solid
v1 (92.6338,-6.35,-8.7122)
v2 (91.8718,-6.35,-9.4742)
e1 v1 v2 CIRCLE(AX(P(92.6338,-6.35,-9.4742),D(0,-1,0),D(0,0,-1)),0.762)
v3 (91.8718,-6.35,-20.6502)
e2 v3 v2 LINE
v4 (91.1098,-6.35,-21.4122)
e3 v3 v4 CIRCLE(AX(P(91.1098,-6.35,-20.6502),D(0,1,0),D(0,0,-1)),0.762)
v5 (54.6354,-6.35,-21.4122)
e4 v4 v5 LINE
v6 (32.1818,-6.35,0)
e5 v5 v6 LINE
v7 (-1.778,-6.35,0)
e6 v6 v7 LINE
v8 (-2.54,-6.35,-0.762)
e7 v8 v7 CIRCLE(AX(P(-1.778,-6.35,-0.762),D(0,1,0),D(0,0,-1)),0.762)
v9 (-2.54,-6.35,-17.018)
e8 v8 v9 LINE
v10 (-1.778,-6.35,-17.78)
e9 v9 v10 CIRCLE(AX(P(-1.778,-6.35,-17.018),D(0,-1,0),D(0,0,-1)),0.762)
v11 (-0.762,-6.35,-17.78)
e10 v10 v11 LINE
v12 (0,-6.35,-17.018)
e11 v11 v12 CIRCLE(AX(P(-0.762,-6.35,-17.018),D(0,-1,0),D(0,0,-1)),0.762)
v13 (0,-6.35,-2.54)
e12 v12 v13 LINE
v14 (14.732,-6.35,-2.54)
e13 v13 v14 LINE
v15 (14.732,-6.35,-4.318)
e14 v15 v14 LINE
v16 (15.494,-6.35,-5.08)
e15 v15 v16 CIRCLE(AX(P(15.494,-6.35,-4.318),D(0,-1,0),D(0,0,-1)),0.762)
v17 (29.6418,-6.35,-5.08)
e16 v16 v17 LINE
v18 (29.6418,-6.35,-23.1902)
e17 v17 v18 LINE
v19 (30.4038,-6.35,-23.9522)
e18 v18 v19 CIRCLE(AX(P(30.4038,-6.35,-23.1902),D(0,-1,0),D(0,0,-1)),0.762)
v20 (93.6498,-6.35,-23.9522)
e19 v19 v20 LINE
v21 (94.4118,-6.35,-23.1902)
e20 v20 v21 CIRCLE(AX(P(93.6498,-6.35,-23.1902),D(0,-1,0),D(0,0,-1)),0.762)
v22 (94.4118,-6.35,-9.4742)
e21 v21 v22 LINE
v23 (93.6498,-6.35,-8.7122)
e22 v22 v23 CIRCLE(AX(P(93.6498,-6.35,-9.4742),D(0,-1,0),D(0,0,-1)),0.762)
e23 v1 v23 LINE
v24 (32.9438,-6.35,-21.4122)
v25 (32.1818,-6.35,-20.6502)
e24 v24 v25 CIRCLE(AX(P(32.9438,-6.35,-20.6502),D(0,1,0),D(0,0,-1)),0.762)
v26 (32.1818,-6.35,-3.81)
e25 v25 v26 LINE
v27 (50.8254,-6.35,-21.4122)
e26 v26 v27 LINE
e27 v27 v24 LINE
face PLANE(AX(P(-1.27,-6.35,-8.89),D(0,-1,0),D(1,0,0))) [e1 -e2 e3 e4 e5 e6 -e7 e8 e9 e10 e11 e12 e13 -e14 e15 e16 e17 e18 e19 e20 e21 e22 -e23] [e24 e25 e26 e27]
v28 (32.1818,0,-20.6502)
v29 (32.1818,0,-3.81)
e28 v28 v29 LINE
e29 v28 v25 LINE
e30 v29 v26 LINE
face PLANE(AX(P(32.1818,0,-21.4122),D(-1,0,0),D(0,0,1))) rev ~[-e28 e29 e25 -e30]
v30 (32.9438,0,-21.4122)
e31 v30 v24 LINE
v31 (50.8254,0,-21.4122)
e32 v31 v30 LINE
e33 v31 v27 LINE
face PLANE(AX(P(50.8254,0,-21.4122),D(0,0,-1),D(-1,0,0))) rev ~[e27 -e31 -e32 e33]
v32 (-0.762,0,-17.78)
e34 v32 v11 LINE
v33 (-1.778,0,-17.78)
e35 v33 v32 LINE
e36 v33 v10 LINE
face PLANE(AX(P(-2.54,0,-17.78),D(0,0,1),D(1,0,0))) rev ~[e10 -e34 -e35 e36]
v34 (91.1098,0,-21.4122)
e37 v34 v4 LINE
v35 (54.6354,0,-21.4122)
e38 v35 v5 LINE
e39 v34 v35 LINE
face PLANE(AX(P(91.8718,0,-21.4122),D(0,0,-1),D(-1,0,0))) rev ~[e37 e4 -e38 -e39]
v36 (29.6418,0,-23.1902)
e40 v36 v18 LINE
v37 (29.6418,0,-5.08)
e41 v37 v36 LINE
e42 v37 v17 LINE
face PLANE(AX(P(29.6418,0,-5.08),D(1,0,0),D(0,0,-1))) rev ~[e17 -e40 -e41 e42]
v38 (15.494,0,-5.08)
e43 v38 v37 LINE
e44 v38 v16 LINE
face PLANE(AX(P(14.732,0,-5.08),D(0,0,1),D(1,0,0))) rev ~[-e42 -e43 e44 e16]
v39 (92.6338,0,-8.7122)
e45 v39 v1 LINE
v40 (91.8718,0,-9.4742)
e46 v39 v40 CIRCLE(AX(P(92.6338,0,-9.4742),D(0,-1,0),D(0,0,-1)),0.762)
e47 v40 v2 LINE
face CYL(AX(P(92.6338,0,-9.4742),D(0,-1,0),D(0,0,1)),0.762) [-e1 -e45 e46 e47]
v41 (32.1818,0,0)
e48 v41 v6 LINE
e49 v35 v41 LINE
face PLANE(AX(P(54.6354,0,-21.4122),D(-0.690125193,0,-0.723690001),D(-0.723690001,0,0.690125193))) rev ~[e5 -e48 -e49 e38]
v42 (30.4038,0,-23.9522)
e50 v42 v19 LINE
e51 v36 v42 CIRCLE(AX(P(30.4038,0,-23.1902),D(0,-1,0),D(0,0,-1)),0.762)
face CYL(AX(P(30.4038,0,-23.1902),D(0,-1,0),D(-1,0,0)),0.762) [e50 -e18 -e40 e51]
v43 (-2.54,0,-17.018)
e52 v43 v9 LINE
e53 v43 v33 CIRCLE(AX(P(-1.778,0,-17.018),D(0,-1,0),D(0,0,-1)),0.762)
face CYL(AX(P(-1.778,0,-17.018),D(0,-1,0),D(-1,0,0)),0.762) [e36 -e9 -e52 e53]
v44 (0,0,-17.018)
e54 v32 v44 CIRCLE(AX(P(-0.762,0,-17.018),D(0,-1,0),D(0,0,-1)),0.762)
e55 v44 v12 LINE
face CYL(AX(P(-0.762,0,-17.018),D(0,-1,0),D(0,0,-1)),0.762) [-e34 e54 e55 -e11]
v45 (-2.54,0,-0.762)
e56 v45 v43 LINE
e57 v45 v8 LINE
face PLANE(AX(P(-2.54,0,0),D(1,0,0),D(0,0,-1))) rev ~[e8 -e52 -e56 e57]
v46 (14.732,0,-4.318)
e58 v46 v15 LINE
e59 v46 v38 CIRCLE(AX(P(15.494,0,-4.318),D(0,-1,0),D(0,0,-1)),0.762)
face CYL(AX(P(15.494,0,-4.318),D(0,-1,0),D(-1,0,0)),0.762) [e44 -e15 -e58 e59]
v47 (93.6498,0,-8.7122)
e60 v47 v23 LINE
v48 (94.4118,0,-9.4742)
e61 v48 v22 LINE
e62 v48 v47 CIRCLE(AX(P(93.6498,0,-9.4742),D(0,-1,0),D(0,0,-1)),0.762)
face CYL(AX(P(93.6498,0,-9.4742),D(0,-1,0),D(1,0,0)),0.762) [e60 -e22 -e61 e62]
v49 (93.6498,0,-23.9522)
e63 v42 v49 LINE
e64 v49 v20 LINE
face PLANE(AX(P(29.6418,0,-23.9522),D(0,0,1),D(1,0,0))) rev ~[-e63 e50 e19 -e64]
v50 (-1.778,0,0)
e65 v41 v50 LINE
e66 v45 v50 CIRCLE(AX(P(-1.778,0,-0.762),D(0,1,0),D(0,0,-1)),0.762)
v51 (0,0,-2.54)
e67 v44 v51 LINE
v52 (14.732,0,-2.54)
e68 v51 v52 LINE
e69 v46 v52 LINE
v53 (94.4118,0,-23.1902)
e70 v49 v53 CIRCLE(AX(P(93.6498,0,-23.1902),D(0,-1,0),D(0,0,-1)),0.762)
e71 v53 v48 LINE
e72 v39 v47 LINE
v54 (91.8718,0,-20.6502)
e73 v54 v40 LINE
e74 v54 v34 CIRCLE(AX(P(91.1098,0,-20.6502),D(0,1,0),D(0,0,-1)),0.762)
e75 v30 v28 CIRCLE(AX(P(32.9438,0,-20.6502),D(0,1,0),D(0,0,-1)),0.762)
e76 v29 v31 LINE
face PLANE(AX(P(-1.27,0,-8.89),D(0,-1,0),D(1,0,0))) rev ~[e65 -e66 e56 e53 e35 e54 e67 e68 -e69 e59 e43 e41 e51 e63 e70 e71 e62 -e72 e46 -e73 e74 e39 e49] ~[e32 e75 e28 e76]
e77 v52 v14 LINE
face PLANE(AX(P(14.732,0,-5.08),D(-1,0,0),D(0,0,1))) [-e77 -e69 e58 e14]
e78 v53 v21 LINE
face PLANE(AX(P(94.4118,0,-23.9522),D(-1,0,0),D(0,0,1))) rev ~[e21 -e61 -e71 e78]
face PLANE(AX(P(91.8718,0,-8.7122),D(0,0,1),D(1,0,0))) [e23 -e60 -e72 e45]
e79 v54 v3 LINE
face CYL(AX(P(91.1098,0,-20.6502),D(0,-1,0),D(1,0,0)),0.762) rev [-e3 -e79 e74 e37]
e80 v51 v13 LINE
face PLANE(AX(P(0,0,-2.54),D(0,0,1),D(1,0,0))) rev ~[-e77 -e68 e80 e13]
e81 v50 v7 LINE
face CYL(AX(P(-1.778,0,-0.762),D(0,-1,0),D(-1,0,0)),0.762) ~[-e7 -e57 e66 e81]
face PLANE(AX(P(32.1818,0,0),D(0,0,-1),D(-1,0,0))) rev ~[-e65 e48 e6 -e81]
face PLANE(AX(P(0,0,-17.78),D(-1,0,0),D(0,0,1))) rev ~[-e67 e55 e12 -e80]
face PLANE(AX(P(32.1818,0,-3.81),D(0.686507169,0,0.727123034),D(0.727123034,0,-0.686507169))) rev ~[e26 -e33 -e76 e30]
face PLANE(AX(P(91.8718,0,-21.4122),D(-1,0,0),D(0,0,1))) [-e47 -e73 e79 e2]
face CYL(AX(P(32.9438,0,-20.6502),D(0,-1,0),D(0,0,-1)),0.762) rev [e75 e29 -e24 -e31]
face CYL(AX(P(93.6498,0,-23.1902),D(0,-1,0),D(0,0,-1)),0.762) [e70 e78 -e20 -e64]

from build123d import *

# Parameters (mm, degrees)
F0_W     = 14.9098
F0_H     = 2.54
F0_W_2   = 2.54
F0_H_2   = 12.7
F1_DEPTH = 6.35
F2_R     = 0.762


with BuildPart() as f1:
    # F0 (on Front) → F1 (new body)
    with BuildSketch(Plane.XZ):
        Polygon((0, -2.54), (0, 0), (-2.54, 0), (-2.54, -17.78), (0, -17.78), align=None)
        Polygon((29.6418, 0), (0, 0), (0, -2.54), (14.732, -2.54), (29.6418, -2.54), align=None)
        with Locations((22.1869, -3.81)):
            Rectangle(F0_W, F0_H)
        Polygon((32.1818, 0), (29.6418, 0), (29.6418, -2.54), (29.6418, -5.08), (29.6418, -23.9522), (32.1818, -23.9522), (32.1818, -21.4122), (32.1818, -3.81), align=None)
        Polygon((91.8718, -21.4122), (54.6354, -21.4122), (50.8254, -21.4122), (32.1818, -21.4122), (32.1818, -23.9522), (94.4118, -23.9522), (94.4118, -21.4122), align=None)
        with Locations((93.1418, -15.0622)):
            Rectangle(F0_W_2, F0_H_2)
        Polygon((54.6354, -21.4122), (32.1818, 0), (32.1818, -3.81), (50.8254, -21.4122), align=None)
    extrude(amount=F1_DEPTH)

    # F2
    f2_edges = [f1.edges().sort_by_distance(p)[0] for p in [
        (-2.54, -3.175, -17.78),
        (0, -3.175, -17.78),
        (-2.54, -3.175, 0),
        (32.1818, -3.175, -21.4122),
        (14.732, -3.175, -5.08),
        (29.6418, -3.175, -23.9522),
        (94.4118, -3.175, -23.9522),
        (94.4118, -3.175, -8.7122),
        (91.8718, -3.175, -8.7122),
        (91.8718, -3.175, -21.4122),
    ]]
    fillet(f2_edges, radius=F2_R)


solid = f1.part
